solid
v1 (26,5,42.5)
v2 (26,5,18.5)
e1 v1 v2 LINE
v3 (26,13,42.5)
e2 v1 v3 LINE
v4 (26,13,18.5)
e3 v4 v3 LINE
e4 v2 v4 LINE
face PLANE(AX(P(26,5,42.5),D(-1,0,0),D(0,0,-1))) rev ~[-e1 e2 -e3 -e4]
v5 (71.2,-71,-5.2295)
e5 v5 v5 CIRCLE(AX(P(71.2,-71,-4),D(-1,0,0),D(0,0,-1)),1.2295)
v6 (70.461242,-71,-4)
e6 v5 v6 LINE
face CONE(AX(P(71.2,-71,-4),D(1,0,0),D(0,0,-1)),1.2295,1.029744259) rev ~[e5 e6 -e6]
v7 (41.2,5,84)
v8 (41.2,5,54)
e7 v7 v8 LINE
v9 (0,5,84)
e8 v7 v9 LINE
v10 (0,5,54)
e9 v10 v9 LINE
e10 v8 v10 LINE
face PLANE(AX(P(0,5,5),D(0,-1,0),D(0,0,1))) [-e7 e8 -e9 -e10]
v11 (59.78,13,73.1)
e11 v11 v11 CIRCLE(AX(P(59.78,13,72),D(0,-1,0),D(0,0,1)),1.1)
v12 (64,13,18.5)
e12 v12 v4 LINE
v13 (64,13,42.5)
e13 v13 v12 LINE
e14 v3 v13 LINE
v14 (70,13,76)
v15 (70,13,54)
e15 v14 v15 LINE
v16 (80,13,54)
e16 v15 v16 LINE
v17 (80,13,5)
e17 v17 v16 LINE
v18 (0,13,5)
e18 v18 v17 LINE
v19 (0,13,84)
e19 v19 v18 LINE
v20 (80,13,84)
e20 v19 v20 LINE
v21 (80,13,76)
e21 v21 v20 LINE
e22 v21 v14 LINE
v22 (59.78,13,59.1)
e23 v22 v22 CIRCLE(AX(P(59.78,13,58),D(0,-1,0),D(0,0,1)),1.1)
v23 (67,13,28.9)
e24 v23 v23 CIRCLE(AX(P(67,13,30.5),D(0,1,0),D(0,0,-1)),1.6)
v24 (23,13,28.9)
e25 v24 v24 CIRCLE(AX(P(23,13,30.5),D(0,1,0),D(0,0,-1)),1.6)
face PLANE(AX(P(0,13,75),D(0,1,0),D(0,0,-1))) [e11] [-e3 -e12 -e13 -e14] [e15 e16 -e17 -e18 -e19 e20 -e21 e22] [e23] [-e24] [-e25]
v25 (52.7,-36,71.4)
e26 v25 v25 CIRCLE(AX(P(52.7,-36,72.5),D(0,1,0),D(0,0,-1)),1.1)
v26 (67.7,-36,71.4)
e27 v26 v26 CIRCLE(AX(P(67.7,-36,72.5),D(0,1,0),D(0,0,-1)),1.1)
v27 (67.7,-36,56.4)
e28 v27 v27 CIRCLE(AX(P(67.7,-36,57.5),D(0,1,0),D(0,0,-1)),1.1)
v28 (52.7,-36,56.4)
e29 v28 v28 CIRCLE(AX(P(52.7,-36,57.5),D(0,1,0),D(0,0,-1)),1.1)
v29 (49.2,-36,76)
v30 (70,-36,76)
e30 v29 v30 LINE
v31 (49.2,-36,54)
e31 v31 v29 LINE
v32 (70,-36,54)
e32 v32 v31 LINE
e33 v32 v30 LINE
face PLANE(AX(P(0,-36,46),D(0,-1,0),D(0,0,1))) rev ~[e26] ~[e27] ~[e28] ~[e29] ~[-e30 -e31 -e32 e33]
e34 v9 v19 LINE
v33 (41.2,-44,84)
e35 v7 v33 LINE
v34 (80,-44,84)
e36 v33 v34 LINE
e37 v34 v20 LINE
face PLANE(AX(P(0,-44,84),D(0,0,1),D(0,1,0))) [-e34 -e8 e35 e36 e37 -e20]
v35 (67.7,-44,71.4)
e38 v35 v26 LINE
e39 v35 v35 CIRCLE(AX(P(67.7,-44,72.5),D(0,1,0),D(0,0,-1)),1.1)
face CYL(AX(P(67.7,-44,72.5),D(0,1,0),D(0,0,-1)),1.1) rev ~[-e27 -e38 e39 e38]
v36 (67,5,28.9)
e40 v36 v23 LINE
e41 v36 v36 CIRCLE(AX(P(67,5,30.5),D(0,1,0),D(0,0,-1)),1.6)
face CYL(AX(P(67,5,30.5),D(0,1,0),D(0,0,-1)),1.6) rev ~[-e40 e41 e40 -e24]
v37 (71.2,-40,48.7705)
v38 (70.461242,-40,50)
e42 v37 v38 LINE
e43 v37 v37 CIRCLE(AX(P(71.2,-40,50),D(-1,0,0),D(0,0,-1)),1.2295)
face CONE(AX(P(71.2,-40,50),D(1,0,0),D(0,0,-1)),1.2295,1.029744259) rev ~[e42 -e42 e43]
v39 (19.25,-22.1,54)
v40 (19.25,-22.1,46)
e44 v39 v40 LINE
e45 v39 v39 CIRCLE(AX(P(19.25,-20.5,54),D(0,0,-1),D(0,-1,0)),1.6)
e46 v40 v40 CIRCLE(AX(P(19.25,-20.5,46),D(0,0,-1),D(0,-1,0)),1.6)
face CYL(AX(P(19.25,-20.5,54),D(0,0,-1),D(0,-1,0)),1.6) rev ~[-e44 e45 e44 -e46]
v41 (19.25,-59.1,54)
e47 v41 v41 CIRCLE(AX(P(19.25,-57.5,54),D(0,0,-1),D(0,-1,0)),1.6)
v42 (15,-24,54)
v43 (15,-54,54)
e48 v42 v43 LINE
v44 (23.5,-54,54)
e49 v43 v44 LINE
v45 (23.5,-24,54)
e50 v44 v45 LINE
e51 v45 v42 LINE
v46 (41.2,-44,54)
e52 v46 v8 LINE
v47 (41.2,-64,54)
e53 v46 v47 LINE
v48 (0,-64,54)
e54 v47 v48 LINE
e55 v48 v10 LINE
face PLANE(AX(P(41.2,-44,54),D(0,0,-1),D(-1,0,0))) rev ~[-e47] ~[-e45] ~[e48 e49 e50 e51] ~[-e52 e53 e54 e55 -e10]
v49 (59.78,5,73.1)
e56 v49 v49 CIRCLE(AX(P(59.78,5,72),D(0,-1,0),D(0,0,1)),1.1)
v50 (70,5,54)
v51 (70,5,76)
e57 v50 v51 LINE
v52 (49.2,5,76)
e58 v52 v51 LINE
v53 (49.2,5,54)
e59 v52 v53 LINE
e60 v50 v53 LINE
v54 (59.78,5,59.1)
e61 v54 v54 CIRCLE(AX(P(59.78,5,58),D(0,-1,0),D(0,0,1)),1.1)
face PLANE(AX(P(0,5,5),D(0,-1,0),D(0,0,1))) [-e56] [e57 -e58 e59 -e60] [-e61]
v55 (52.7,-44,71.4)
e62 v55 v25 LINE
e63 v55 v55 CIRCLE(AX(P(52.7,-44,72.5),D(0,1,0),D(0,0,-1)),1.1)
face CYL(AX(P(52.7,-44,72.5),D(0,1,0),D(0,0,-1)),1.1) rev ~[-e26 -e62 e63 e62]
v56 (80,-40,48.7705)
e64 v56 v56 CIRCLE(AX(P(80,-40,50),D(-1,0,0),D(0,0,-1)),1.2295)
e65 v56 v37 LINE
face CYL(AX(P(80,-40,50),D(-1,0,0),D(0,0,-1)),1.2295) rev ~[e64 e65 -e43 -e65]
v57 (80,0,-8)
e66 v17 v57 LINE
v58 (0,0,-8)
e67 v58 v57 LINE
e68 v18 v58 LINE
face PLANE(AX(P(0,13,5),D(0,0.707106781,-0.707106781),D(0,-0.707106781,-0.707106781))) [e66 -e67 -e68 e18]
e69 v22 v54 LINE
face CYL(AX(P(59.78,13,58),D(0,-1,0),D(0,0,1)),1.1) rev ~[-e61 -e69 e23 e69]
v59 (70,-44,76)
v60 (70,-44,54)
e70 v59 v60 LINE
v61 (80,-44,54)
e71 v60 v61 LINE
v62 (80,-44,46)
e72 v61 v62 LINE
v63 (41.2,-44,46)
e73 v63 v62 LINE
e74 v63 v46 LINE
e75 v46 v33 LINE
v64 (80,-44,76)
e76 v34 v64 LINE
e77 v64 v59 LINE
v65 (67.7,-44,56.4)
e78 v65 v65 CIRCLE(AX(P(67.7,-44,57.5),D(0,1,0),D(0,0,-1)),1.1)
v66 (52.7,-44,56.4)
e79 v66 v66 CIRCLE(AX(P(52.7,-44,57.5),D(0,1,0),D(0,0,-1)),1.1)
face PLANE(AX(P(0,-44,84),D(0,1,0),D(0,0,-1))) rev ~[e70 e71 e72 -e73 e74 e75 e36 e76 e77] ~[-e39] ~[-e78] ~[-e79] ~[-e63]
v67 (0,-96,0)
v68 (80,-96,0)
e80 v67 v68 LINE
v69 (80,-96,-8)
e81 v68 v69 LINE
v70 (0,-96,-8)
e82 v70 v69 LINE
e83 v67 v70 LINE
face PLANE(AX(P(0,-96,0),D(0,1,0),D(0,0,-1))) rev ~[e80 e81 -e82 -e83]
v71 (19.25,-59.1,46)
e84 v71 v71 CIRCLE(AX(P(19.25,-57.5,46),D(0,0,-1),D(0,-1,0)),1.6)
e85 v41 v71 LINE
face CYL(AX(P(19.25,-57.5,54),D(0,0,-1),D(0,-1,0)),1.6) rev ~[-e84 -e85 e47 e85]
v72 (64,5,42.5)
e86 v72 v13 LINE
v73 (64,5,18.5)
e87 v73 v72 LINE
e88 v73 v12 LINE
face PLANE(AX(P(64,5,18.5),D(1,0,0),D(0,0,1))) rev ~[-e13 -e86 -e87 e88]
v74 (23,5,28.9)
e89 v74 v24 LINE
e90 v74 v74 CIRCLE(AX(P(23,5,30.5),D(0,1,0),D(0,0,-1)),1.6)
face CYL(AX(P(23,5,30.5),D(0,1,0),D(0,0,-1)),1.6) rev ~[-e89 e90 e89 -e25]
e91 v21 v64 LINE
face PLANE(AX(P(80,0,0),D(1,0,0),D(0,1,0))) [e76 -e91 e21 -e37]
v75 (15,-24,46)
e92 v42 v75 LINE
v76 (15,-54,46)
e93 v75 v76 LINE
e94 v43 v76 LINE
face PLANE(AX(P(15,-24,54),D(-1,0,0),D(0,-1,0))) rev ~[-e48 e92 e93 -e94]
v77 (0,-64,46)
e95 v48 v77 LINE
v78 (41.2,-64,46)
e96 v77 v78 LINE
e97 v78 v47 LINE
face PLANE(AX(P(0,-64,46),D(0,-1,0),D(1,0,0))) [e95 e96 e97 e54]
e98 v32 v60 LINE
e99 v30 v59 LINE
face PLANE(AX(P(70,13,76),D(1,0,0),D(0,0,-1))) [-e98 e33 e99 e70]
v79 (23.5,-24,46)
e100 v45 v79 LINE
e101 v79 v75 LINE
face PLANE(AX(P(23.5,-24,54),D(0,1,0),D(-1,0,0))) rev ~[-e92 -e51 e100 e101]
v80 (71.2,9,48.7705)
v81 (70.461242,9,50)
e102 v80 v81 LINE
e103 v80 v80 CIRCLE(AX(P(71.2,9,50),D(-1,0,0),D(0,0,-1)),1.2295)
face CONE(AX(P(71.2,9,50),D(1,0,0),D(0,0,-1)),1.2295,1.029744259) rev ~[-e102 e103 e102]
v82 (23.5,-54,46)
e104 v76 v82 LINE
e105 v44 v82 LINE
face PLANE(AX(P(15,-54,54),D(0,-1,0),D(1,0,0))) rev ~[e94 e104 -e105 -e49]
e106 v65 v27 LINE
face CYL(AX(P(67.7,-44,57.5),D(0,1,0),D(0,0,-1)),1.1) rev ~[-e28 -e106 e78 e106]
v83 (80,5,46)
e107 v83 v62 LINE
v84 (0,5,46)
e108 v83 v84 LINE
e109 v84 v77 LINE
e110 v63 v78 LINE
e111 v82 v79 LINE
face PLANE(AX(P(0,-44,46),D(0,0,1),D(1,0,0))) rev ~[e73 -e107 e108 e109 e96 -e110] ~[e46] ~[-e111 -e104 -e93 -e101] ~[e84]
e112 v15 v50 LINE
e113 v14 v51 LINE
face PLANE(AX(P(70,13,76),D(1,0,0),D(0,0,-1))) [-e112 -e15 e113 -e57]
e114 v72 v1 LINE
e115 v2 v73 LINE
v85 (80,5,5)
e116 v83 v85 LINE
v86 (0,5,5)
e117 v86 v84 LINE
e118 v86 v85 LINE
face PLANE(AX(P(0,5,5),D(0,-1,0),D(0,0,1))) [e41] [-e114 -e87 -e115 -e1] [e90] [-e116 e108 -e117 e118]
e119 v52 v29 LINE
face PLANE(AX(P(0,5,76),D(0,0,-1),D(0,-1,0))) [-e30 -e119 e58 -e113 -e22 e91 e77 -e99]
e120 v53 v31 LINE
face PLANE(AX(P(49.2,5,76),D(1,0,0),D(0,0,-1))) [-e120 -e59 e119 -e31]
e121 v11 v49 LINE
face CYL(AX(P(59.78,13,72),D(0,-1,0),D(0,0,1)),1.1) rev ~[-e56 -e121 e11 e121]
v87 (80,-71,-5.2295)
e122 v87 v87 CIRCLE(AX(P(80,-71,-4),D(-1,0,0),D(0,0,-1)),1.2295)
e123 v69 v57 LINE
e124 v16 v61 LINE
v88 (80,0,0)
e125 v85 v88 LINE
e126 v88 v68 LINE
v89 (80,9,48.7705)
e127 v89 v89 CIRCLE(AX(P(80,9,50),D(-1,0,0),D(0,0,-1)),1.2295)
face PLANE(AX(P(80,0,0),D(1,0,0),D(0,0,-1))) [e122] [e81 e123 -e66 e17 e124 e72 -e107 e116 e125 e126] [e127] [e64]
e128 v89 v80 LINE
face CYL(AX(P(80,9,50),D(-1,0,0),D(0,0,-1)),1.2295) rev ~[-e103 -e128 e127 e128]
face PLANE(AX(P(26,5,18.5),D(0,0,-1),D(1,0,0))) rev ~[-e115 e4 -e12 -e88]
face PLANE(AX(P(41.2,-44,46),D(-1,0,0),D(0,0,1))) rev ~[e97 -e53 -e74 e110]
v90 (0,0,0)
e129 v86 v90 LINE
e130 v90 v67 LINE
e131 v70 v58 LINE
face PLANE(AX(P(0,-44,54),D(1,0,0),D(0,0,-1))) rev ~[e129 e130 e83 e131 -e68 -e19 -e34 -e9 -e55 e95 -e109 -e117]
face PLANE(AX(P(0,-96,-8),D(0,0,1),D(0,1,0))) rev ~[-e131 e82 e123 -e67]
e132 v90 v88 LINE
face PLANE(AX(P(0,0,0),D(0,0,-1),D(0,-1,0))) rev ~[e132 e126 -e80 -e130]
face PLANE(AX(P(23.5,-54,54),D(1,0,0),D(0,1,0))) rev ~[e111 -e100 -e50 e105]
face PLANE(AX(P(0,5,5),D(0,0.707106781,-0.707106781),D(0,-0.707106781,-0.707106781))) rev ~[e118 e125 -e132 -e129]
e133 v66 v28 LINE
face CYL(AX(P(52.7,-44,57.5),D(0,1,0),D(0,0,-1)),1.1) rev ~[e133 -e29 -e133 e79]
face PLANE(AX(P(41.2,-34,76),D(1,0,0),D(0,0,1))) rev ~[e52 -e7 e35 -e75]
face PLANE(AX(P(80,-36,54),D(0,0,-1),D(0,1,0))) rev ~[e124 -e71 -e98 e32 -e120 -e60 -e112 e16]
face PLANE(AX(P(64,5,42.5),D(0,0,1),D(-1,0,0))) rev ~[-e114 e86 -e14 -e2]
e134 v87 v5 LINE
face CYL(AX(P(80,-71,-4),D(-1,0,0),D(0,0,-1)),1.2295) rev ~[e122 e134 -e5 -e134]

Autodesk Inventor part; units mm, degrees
ref_plane "YZ Plane" through (0, 0, 0) normal (1, 0, 0) x (0, 1, 0)
ref_plane "XZ Plane" through (0, 0, 0) normal (0, 1, 0) x (-1, 0, 0)
ref_plane "XY Plane" through (0, 0, 0) normal (0, 0, 1) x (1, 0, 0)
sketch "スケッチ1" plane through (0, 0, 0) normal (1, 0, 0) x (0, 1, 0)
  line L0 (0, 0) -> (-96, 0)
  line L1 (-96, 0) -> (-96, -8)
  line L2 (-96, -8) -> (0, -8)
  line L3 (0, -8) -> (0, 0)
  line L4 (13, 5) -> (5, 5)
  line L5 (5, 5) -> (5, 75)
  line L6 (5, 75) -> (13, 75)
  line L7 (13, 75) -> (13, 5)
  line L8 (13, 5) -> (0, -8)
  line L9 (5, 5) -> (0, 0)
  line L10 (-44, 84) -> (13, 84)
  line L11 (13, 84) -> (13, 75)
  line L12 (-44, 76) -> (-44, 46)
  line L13 (-44, 46) -> (-36, 46)
  line L14 (-36, 46) -> (-36, 76)
  line L15 (5, 75) -> (5, 76)
  line L16 (5, 76) -> (-44, 76)
  line L17 (-44, 84) -> (-44, 76)
  point P0 (-36, 0)
  point P1 (-36, 76)
  point P2 (-44, 76)
  dimension "d0" = 8
  dimension "d2" = 8
  dimension "d3" = 70
  dimension "d4" = 96
  dimension "d17" = 13
  dimension "d36" = 8
  dimension "d37" = 41
  dimension "d53" = 1
  dimension "d54" = 8
  dimension "d55" = 30
  dimension "d72" = 57
  dimension "d86" = 30
extrude "押し出し1" add sketch "スケッチ1" along normal blind 80
sketch "スケッチ2" plane through (80, 0, 0) normal (1, 0, 0) x (0, 0, -1)
  line L0 (8, -96) -> (8, 0) projected
  point P0 (0, 0)
  point P1 (4, -71)
  point P2 (-50, 9)
  point P3 (-50, -40)
  dimension "d9" = 4
  dimension "d19" = 80
  dimension "d84" = 58
  dimension "d87" = 49
hole "穴1" at (80, -71, -4) at (80, 9, 50) at (80, -40, 50) direction (-1, 0, 0) diameter 2.459 depth 8.8 tip angle 118 thread size "M3x0.5" class "6H" standard "ISO Metric profile"
sketch "スケッチ5" plane through (0, 13, 84) normal (0, 1, 0) x (1, 0, 0)
  line L0 (80, 8) -> (70, 8)
  line L1 (70, 8) -> (70, 30)
  line L2 (70, 30) -> (80, 30)
  line L3 (80, 30) -> (80, 8)
  line L4 (0, 0) -> (80, 0) projected
  line L5 (80, 79) -> (80, 0) projected
  point P0 (0, 84)
  dimension "d38" = 8
  dimension "d39" = 10
  dimension "d40" = 22
extrude "押し出し3" cut sketch "スケッチ5" against normal blind 80
sketch "スケッチ6" plane through (0, 13, 84) normal (0, 1, 0) x (1, 0, 0)
  line L0 (80, 8) -> (80, 0) projected
  line L1 (0, 0) -> (80, 0) projected
  point P0 (0, 84)
  point P1 (59.78, 12)
  point P2 (59.78, 26)
  dimension "d43" = 20.22
  dimension "d44" = 12
  dimension "d45" = 14
hole "穴3" at (59.78, 13, 72) at (59.78, 13, 58) direction (0, -1, 0) diameter 2.2 depth 8.8 tip angle 118
sketch "スケッチ7" plane through (0, -44, 46) normal (0, -1, 0) x (1, 0, 0)
  line L0 (80, 8) -> (80, 0) projected
  line L1 (80, 8) -> (70, 8) projected
  point P0 (0, -46)
  point P1 (67.7, 26.5)
  point P2 (67.7, 11.5)
  point P3 (52.7, 26.5)
  point P4 (52.7, 11.5)
  dimension "d58" = 15
  dimension "d59" = 15
  dimension "d60" = 12.3
  dimension "d61" = 3.5
hole "穴4" at (67.7, -44, 72.5) at (67.7, -44, 57.5) at (52.7, -44, 72.5) at (52.7, -44, 57.5) direction (0, 1, 0) diameter 2.2 depth 8 tip angle 118
sketch "スケッチ8" plane through (0, -44, 46) normal (0, -1, 0) x (1, 0, 0)
  line L0 (0, 38) -> (41.2, 38)
  line L1 (41.2, 38) -> (41.2, 8)
  line L2 (41.2, 8) -> (0, 8)
  line L3 (0, 8) -> (0, 38)
  line L4 (0, -46) -> (80, -46) projected
  line L5 (0, 38) -> (0, -46) projected
  line L6 (0, 38) -> (80, 38) projected
  circle A0 centre (52.7, 26.5) radius 1.1 projected
  line L7 (80, 8) -> (70, 8) projected
  dimension "d75" = 11.5
  dimension "d83" = 0
extrude "押し出し4" cut sketch "スケッチ8" against normal blind 10 contours L0 L1 L2 L3
sketch "スケッチ9" plane through (0, -34, 46) normal (0, -1, 0) x (1, 0, 0)
  point P0 (0, -46)
sketch "スケッチ10" plane through (0, -34, 46) normal (0, -1, 0) x (1, 0, 0)
  line L0 (41.2, 38) -> (0, 38)
  line L1 (0, 38) -> (0, 30)
  line L2 (0, 30) -> (41.2, 30)
  line L3 (41.2, 30) -> (41.2, 38)
  line L4 (0, 38) -> (41.2, 38) projected
  line L5 (41.2, 38) -> (41.2, 8) projected
  line L6 (0, 30) -> (0, 38) projected
  line L7 (41.2, 30) -> (0, 30) projected
  point P0 (0, -46)
  point P1 (41.2, 0)
extrude "押し出し5" cut sketch "スケッチ10" against normal blind 39
sketch "スケッチ11" plane through (0, 5, 5) normal (0, -1, 0) x (1, 0, 0)
  point P0 (0, -5)
sketch "スケッチ12" plane through (0, 5, 5) normal (0, -1, 0) x (1, 0, 0)
  line L0 (41.2, 71) -> (49.2, 71)
  line L1 (49.2, 71) -> (49.2, 49)
  line L2 (49.2, 49) -> (41.2, 49)
  line L3 (41.2, 49) -> (41.2, 71)
  point P0 (0, -5)
  point P1 (70, 71)
  point P2 (41.2, 71)
  dimension "d76" = 8
  dimension "d77" = 22
extrude "押し出し6" add sketch "スケッチ12" along normal blind 49
sketch "スケッチ13" plane through (80, 0, 0) normal (1, 0, 0) x (0, 0, -1)
  line L0 (-54, 5) -> (-46, 5)
  line L1 (-46, 5) -> (-46, -36)
  line L2 (-46, -36) -> (-54, -36)
  line L3 (-54, -36) -> (-54, 5)
  line L4 (-54, 5) -> (-5, 5) projected
  line L5 (-46, -36) -> (-54, -36) projected
  line L6 (-54, 5) -> (-54, -36) projected
  line L7 (-46, -44) -> (-46, -36) projected
  point P0 (0, 0)
extrude "押し出し7" add sketch "スケッチ13" against normal blind 80
sketch "スケッチ14" plane through (0, 5, 46) normal (0, -1, 0) x (1, 0, 0)
  line L0 (70, -0.5) -> (20, -0.5)
  line L1 (20, -0.5) -> (20, -30.5)
  line L2 (20, -30.5) -> (70, -30.5)
  line L3 (70, -30.5) -> (70, -0.5)
  line L4 (0, -41) -> (0, 0) projected
  line L5 (0, 0) -> (80, 0) projected
  line L6 (64, -3.5) -> (26, -3.5)
  line L7 (26, -3.5) -> (26, -27.5)
  line L8 (26, -27.5) -> (64, -27.5)
  line L9 (64, -27.5) -> (64, -3.5)
  point P0 (0, -46)
  point P1 (0, -20.5)
  point P2 (67, -15.5)
  point P3 (23, -15.5)
  dimension "d88" = 20
  dimension "d89" = 30
  dimension "d90" = 50
  dimension "d91" = 0.5
  dimension "d92" = 6
  dimension "d93" = 6
  dimension "d94" = 3
  dimension "d95" = 3
  dimension "d98" = 44
  dimension "d99" = 3
extrude "押し出し8" cut sketch "スケッチ14" against normal blind 10 contours L9 L8 L7 L6
hole "穴5" at (67, 5, 30.5) at (23, 5, 30.5) direction (0, 1, 0) diameter 3.2 depth 8.8 tip angle 118
sketch "スケッチ15" plane through (0, -44, 46) normal (0, -1, 0) x (1, 0, 0)
  point P0 (0, -46)
sketch "スケッチ16" plane through (0, -44, 46) normal (0, -1, 0) x (1, 0, 0)
  line L0 (0, 0) -> (41.2, 0)
  line L1 (41.2, 0) -> (41.2, 8)
  line L2 (41.2, 8) -> (0, 8)
  line L3 (0, 8) -> (0, 0)
  point P0 (0, -46)
  dimension "d107" = 8
  dimension "d108" = 41.2
extrude "押し出し9" add sketch "スケッチ16" along normal blind 20
sketch "スケッチ20" plane through (0, 5, 54) normal (0, 0, 1) x (1, 0, 0)
  line L0 (15, -59) -> (23.5, -59)
  line L1 (23.5, -59) -> (23.5, -29)
  line L2 (23.5, -29) -> (15, -29)
  line L3 (15, -29) -> (15, -59)
  line L4 (41.2, -69) -> (0, -69) projected
  line L5 (0, -69) -> (0, 0) projected
  point P0 (0, -5)
  point P1 (19.25, -62.5)
  point P2 (19.25, -25.5)
  point P3 (23.5, -44)
  point P4 (19.25, -29)
  dimension "d111" = 10
  dimension "d112" = 30
  dimension "d113" = 37
  dimension "d114" = 8.5
  dimension "d115" = 15
  dimension "d116" = 18.5
extrude "押し出し10" cut sketch "スケッチ20" against normal blind 20
hole "穴6" at (19.25, -57.5, 54) at (19.25, -20.5, 54) direction (0, 0, -1) diameter 3.2 depth 8.8 tip angle 118
equation "\"d116\" = 0.5 * d113"
properties part number "左仕切り"
